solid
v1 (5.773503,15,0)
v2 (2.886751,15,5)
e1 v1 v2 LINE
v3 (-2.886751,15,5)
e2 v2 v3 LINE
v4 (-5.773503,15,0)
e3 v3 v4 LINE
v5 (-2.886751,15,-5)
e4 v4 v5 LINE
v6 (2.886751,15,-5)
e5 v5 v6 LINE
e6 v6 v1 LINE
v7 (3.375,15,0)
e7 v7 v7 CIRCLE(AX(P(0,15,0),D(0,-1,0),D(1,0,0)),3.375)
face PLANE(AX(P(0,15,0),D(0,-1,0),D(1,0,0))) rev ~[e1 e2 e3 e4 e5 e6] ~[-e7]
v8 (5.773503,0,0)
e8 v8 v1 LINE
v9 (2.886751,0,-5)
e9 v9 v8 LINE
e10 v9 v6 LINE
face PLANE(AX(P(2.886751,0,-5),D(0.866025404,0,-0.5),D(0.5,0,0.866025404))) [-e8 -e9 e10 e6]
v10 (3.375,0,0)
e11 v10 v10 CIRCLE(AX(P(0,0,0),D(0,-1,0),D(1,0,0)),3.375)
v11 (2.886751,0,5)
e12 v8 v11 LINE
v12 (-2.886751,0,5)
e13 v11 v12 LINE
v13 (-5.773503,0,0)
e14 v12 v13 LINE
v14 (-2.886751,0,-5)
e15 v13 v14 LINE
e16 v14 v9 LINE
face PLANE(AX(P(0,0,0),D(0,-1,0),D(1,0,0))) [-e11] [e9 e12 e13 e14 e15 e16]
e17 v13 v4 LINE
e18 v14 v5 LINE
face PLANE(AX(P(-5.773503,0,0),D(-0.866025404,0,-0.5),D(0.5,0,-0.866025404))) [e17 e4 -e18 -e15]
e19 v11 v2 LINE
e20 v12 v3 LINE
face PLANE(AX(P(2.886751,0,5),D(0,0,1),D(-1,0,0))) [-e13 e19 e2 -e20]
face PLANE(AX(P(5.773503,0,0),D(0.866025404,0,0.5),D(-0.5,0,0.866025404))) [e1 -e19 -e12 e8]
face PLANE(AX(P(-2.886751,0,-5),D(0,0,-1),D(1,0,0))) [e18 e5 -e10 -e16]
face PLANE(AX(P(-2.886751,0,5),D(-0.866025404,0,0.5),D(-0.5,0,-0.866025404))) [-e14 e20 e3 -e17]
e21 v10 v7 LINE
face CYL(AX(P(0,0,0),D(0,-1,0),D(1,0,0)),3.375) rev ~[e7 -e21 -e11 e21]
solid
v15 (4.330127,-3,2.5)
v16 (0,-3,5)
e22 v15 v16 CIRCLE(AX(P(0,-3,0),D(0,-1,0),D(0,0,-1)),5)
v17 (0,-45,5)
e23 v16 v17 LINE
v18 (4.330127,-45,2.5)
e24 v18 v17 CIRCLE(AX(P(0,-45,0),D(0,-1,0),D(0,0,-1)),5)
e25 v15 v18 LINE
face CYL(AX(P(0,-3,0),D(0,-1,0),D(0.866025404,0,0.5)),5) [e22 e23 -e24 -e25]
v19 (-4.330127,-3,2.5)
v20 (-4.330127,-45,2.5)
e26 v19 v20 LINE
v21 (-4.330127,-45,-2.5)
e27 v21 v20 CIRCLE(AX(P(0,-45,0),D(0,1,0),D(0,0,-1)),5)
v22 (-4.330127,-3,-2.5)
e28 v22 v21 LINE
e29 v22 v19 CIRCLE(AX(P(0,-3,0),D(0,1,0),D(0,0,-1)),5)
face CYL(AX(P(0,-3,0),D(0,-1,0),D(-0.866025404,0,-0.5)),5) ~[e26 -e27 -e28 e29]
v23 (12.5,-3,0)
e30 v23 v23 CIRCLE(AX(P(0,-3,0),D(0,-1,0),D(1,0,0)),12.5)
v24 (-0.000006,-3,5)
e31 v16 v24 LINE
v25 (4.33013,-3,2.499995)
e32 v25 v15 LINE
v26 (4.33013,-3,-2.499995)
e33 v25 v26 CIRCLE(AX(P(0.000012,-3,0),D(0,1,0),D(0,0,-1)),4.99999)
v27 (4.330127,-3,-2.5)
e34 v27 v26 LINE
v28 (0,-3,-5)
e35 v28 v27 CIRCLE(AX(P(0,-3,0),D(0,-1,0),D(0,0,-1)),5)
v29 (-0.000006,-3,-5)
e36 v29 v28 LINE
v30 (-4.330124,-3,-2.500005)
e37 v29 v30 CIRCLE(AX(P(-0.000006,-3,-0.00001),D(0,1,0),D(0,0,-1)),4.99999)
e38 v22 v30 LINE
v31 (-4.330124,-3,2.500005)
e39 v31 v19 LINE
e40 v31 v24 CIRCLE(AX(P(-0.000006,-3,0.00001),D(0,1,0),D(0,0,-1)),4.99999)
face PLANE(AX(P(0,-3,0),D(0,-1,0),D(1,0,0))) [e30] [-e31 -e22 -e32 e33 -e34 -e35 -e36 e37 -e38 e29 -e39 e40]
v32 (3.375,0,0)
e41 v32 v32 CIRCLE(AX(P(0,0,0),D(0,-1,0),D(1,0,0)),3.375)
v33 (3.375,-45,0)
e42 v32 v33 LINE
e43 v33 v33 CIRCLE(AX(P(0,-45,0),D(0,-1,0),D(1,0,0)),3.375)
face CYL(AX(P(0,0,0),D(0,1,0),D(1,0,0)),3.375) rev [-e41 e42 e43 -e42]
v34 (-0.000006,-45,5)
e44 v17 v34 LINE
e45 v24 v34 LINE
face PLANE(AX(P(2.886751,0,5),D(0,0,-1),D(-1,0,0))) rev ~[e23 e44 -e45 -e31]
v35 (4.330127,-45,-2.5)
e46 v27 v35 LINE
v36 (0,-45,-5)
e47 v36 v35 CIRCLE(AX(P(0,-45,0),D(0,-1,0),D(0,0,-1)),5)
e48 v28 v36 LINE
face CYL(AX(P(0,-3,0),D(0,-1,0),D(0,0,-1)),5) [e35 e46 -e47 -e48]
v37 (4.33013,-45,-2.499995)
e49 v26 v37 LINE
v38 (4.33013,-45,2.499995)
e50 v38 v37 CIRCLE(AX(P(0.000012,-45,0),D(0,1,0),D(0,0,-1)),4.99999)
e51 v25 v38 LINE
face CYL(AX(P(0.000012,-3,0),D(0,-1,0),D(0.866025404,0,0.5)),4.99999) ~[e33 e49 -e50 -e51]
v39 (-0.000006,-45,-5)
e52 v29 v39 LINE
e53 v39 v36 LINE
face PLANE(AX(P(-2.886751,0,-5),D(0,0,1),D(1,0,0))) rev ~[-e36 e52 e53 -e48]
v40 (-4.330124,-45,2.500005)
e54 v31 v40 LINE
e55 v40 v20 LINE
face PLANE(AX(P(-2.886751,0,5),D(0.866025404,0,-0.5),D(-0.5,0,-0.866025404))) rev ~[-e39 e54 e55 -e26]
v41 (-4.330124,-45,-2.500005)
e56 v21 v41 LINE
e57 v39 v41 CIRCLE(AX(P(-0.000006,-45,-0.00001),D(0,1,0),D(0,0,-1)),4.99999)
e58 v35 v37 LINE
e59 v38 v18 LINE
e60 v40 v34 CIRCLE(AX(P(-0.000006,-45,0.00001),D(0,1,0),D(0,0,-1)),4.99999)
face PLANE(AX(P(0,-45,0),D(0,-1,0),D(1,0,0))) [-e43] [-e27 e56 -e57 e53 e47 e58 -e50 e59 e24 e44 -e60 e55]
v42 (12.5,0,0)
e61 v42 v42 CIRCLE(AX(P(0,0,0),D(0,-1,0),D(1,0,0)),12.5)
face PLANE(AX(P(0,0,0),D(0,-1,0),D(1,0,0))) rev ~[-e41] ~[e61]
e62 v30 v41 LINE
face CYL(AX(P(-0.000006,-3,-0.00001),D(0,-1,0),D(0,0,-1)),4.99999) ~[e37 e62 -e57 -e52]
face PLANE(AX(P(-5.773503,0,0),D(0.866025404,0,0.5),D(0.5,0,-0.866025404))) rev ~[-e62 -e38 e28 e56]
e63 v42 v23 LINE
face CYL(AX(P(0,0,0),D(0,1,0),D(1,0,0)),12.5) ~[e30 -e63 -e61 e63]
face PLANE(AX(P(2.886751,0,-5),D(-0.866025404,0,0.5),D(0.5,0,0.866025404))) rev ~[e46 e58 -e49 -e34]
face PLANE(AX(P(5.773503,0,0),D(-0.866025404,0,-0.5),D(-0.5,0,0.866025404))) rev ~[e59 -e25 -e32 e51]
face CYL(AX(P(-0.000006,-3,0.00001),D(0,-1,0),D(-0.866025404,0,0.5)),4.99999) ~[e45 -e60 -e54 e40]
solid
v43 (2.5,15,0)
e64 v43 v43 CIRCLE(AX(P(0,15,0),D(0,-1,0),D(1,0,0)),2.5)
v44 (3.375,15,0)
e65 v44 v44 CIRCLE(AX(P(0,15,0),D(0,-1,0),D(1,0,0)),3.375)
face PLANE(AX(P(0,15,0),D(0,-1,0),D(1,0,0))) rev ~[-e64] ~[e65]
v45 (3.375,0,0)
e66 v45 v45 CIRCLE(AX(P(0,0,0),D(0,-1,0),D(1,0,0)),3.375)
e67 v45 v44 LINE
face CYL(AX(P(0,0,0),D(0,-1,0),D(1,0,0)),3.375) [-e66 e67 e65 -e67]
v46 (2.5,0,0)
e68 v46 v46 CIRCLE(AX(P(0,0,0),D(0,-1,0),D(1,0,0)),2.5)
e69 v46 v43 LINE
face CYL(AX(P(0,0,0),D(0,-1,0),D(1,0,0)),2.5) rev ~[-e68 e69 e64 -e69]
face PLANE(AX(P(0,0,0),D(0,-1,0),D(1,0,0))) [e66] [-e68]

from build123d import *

# Parameters (mm, degrees)
F0_R      = 3.375
F1_DEPTH  = 45
F0_R_2    = 12.5
F2_DEPTH  = 3
F3_DEPTH  = 15
F4_R      = 5
F5_R      = 4.99999
F6_R      = 5
F7_R      = 4.99999
F8_R      = 4.99999
F9_R      = 5
F0_R_3    = 2.5
F10_DEPTH = 15


# Not quite as in the source:
# - a fillet or chamfer is up to 0.001 mm smaller than in the source, because OpenCascade refuses the exact size


with BuildPart() as f1:
    # F0 (on Front) → F1 (new body)
    with BuildSketch(Plane.XZ):
        Polygon((2.8867513459, -5), (5.7735026919, 0), (2.8867513459, 5), (-2.8867513459, 5), (-5.7735026919, 0), (-2.8867513459, -5), align=None)
        Circle(F0_R, mode=Mode.SUBTRACT)
    extrude(amount=F1_DEPTH)

    # F0 (on Front) → F2 (join)
    with BuildSketch(Plane.XZ):
        Circle(F0_R_2)
        Polygon((2.8867513459, 5), (5.7735026919, 0), (2.8867513459, -5), (-2.8867513459, -5), (-5.7735026919, 0), (-2.8867513459, 5), align=None, mode=Mode.SUBTRACT)
        Polygon((2.8867513459, -5), (5.7735026919, 0), (2.8867513459, 5), (-2.8867513459, 5), (-5.7735026919, 0), (-2.8867513459, -5), align=None)
        Circle(F0_R, mode=Mode.SUBTRACT)
    extrude(amount=F2_DEPTH)

    # F4
    f4_edges = [f1.edges().sort_by_distance(p)[0] for p in [
        (2.886751, -24, -5),
    ]]
    fillet(f4_edges, radius=F4_R)

    # F5 (radius 5 in the source; OpenCascade refuses exactly that, so slightly less here)
    f5_edges = [f1.edges().sort_by_distance(p)[0] for p in [
        (-2.886751, -24, -5),
    ]]
    fillet(f5_edges, radius=F5_R)

    # F6
    f6_edges = [f1.edges().sort_by_distance(p)[0] for p in [
        (-5.773503, -24, 0),
    ]]
    fillet(f6_edges, radius=F6_R)

    # F7 (radius 5 in the source; OpenCascade refuses exactly that, so slightly less here)
    f7_edges = [f1.edges().sort_by_distance(p)[0] for p in [
        (-2.886751, -24, 5),
    ]]
    fillet(f7_edges, radius=F7_R)

    # F8 (radius 5 in the source; OpenCascade refuses exactly that, so slightly less here)
    f8_edges = [f1.edges().sort_by_distance(p)[0] for p in [
        (5.773503, -24, 0),
    ]]
    fillet(f8_edges, radius=F8_R)

    # F9
    f9_edges = [f1.edges().sort_by_distance(p)[0] for p in [
        (2.886751, -24, 5),
    ]]
    fillet(f9_edges, radius=F9_R)


with BuildPart() as f3:
    # F0 (on Front) → F3 (new body)
    with BuildSketch(Plane.XZ):
        Polygon((2.8867513459, -5), (5.7735026919, 0), (2.8867513459, 5), (-2.8867513459, 5), (-5.7735026919, 0), (-2.8867513459, -5), align=None)
        Circle(F0_R, mode=Mode.SUBTRACT)
    extrude(amount=-F3_DEPTH)


with BuildPart() as f10:
    # F0 (on Front) → F10 (new body)
    with BuildSketch(Plane.XZ):
        Circle(F0_R)
        Circle(F0_R_3, mode=Mode.SUBTRACT)
    extrude(amount=-F10_DEPTH)


solid = Compound([f1.part, f3.part, f10.part])
